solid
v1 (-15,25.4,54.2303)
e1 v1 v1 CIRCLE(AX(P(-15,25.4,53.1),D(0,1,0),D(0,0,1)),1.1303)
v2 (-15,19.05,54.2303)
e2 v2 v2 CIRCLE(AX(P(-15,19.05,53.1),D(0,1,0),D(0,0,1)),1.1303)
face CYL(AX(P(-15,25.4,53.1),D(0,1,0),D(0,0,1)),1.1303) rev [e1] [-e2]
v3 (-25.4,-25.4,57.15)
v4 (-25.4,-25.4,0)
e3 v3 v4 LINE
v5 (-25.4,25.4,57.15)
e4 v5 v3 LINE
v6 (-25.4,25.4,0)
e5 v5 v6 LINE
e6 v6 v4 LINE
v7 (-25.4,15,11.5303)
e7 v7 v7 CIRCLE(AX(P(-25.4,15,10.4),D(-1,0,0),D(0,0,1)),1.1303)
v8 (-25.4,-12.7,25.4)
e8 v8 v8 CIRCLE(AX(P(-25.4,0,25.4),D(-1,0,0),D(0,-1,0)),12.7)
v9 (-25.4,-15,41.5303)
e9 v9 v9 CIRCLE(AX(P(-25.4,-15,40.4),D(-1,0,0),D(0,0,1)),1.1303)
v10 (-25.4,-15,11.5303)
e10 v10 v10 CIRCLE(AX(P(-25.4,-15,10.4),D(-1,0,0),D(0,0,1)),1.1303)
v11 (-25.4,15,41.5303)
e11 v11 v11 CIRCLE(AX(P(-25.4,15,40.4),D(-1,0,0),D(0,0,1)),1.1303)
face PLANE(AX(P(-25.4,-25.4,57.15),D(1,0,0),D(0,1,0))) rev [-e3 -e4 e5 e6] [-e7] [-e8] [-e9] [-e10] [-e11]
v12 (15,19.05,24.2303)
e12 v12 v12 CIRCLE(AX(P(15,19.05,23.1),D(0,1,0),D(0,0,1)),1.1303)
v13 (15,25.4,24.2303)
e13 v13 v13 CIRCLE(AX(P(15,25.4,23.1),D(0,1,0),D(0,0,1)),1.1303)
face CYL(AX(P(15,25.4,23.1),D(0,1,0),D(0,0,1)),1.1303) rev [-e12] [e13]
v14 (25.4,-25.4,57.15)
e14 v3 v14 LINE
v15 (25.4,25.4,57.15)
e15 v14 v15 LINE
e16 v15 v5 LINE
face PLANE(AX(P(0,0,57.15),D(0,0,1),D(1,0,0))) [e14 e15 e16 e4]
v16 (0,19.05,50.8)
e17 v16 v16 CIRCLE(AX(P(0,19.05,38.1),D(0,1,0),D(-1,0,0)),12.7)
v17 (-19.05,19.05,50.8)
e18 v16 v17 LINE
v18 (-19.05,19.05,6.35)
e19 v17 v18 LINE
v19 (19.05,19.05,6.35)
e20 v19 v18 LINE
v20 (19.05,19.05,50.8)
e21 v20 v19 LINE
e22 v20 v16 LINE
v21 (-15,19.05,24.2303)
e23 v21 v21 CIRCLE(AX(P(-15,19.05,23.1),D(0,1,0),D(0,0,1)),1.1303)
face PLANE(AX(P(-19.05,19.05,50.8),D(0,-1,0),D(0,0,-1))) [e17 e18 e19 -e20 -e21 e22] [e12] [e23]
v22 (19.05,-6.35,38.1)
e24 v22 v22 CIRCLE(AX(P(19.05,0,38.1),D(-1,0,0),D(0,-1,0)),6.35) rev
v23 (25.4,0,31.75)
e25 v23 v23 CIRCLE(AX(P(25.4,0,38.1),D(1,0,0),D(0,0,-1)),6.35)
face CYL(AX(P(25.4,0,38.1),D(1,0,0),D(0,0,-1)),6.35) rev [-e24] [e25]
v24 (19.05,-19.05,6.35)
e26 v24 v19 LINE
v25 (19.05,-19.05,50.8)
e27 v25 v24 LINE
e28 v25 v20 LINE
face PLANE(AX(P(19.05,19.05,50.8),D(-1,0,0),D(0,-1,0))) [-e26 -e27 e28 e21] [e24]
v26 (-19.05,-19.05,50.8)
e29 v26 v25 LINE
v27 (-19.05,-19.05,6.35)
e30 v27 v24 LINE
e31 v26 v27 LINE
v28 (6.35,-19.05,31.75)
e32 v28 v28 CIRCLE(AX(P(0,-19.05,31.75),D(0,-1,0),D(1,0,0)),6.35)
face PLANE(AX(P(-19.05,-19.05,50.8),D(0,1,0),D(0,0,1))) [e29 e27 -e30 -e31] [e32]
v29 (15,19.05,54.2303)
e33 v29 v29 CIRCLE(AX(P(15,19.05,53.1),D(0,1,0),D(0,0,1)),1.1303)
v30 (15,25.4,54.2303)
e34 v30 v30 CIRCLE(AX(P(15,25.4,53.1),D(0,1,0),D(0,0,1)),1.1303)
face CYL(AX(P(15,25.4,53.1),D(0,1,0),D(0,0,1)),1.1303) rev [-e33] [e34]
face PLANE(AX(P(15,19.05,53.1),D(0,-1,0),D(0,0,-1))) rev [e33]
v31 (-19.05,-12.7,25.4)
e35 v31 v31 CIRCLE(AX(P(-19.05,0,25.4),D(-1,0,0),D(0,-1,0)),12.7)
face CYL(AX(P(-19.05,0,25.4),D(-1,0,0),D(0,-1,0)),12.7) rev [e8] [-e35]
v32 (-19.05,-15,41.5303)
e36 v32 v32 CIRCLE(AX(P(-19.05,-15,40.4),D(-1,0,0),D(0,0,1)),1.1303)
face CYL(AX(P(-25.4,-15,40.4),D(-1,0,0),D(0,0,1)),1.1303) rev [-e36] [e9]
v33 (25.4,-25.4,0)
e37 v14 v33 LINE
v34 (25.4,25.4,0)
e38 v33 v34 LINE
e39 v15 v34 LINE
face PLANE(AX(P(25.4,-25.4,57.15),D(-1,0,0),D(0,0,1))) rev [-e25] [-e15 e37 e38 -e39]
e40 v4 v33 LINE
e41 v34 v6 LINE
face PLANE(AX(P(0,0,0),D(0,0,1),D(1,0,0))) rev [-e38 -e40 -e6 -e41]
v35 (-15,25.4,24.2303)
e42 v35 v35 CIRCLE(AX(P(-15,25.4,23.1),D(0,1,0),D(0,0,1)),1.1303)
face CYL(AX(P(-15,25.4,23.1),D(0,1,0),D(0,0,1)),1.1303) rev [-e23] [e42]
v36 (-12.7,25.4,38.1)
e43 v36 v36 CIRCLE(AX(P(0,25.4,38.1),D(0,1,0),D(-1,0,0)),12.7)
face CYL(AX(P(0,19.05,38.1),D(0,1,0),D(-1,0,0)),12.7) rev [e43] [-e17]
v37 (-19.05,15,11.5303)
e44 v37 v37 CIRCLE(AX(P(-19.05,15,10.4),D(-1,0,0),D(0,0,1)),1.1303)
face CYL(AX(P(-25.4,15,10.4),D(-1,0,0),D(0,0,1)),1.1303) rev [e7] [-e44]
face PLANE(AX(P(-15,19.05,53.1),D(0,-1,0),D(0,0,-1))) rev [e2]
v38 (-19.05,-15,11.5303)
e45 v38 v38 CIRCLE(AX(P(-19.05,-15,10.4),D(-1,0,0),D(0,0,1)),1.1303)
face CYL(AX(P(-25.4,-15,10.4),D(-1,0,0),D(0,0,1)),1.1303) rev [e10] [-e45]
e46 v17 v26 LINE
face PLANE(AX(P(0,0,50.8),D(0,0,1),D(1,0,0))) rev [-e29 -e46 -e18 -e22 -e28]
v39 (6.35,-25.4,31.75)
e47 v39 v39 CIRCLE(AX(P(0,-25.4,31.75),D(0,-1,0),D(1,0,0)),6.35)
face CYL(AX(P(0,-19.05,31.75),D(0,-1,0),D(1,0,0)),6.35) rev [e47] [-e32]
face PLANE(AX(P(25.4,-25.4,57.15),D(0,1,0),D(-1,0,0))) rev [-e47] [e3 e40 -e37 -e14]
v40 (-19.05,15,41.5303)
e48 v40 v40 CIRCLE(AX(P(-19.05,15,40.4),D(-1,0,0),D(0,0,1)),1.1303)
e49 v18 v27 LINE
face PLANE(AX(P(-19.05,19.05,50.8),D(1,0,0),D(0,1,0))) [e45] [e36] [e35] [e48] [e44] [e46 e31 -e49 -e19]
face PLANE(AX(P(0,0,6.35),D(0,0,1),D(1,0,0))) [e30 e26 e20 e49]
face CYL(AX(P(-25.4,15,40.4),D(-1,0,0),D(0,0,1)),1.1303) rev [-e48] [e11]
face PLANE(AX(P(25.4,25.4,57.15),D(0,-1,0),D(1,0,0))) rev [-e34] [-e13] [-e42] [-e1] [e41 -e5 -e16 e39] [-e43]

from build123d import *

# Parameters (mm, degrees)
SKETCH1_W                                = 50.8
SKETCH1_H                                = 50.8
BOSS_EXTRUDE1_DEPTH                      = 57.15
CUT_EXTRUDE2_START                       = 6.35
SKETCH3_W                                = 38.1
SKETCH3_H                                = 38.1
CUT_EXTRUDE2_DEPTH                       = 44.45
SKETCH5_R                                = 12.7
CUT_EXTRUDE3_DEPTH                       = 6.35
SKETCH6_R                                = 12.7
CUT_EXTRUDE4_DEPTH                       = 6.35
SKETCH7_R                                = 6.35
CUT_EXTRUDE5_DEPTH                       = 6.35
F_3_8_0_375_CLEARANCE_DOWEL_HOLE1_REACH  = 70.392
F_3_8_0_375_CLEARANCE_DOWEL_HOLE1_BORE_R = 6.35
TAP_DRILL_FOR_4_40_TAP1_REACH            = 82.572
TAP_DRILL_FOR_4_40_TAP1_BORE_R           = 1.1303
TAP_START                                = 19.05
TAP_DRILL_FOR_4_40_TAP2_OUTLINE_R        = 1.1303
TAP_DRILL_FOR_4_40_TAP2_DEPTH            = 6.35


# Read off the part's stored shape, not the designer's step: Tap Drill for #4-40 Tap2
with BuildPart() as part:
    # Sketch1 → Boss-Extrude1 (new body)
    with BuildSketch(Plane.XY):
        Rectangle(SKETCH1_W, SKETCH1_H)
    extrude(amount=BOSS_EXTRUDE1_DEPTH)

    # Sketch3 → Cut-Extrude2 (cut)
    with BuildSketch(Plane.XY.offset(CUT_EXTRUDE2_START)):
        Rectangle(SKETCH3_W, SKETCH3_H)
    extrude(amount=CUT_EXTRUDE2_DEPTH, mode=Mode.SUBTRACT)

    # Sketch5 → Cut-Extrude3 (cut)
    with BuildSketch(Plane.ZY.offset(25.4)):
        with Locations(Location((25.4, 0, 0), (0, 0, 270))):
            Circle(SKETCH5_R)
    extrude(amount=-CUT_EXTRUDE3_DEPTH, mode=Mode.SUBTRACT)

    # Sketch6 → Cut-Extrude4 (cut)
    with BuildSketch(Plane(origin=(0, 25.4, 0), x_dir=(1, 0, 0), z_dir=(0, 1, 0))):
        with Locations(Location((0, -38.1, 0), (0, 0, 180))):
            Circle(SKETCH6_R)
    extrude(amount=-CUT_EXTRUDE4_DEPTH, mode=Mode.SUBTRACT)

    # Sketch7 → Cut-Extrude5 (cut)
    with BuildSketch(Plane.XZ.offset(25.4)):
        with Locations((0, 31.75)):
            Circle(SKETCH7_R)
    extrude(amount=-CUT_EXTRUDE5_DEPTH, mode=Mode.SUBTRACT)

    # 3/8 (0.375) Clearance Dowel Hole1 bore (on position points) → 3/8 (0.375) Clearance Dowel Hole1 (cut, up to next)
    with BuildSketch(Plane(origin=(25.4, 0, 38.1), x_dir=(0, 0, 1), z_dir=(1, 0, 0)), mode=Mode.PRIVATE) as f_3_8_0_375_clearance_dowel_hole1_sk1:
        Circle(F_3_8_0_375_CLEARANCE_DOWEL_HOLE1_BORE_R)
    f_3_8_0_375_clearance_dowel_hole1_tool1 = extrude(f_3_8_0_375_clearance_dowel_hole1_sk1.sketch, amount=-F_3_8_0_375_CLEARANCE_DOWEL_HOLE1_REACH, mode=Mode.PRIVATE) & part.part
    add(f_3_8_0_375_clearance_dowel_hole1_tool1.solids().sort_by_distance((25.4, 0, 38.1))[0], mode=Mode.SUBTRACT)

    # Tap Drill for #4-40 Tap1 bore → Tap Drill for #4-40 Tap1 (cut, up to next)
    with BuildSketch(Plane.ZY.offset(25.4), mode=Mode.PRIVATE) as tap_drill_for_4_40_tap1_sk1:
        with Locations((10.4, -15)):
            Circle(TAP_DRILL_FOR_4_40_TAP1_BORE_R)
    tap_drill_for_4_40_tap1_tool1 = extrude(tap_drill_for_4_40_tap1_sk1.sketch, amount=-TAP_DRILL_FOR_4_40_TAP1_REACH, mode=Mode.PRIVATE) & part.part
    # Tap Drill for #4-40 Tap1 bore → Tap Drill for #4-40 Tap1 (cut, up to next)
    with BuildSketch(Plane.ZY.offset(25.4), mode=Mode.PRIVATE) as tap_drill_for_4_40_tap1_sk2:
        with Locations((10.4, 15)):
            Circle(TAP_DRILL_FOR_4_40_TAP1_BORE_R)
    tap_drill_for_4_40_tap1_tool2 = extrude(tap_drill_for_4_40_tap1_sk2.sketch, amount=-TAP_DRILL_FOR_4_40_TAP1_REACH, mode=Mode.PRIVATE) & part.part
    # Tap Drill for #4-40 Tap1 bore → Tap Drill for #4-40 Tap1 (cut, up to next)
    with BuildSketch(Plane.ZY.offset(25.4), mode=Mode.PRIVATE) as tap_drill_for_4_40_tap1_sk3:
        with Locations((40.4, 15)):
            Circle(TAP_DRILL_FOR_4_40_TAP1_BORE_R)
    tap_drill_for_4_40_tap1_tool3 = extrude(tap_drill_for_4_40_tap1_sk3.sketch, amount=-TAP_DRILL_FOR_4_40_TAP1_REACH, mode=Mode.PRIVATE) & part.part
    # Tap Drill for #4-40 Tap1 bore → Tap Drill for #4-40 Tap1 (cut, up to next)
    with BuildSketch(Plane.ZY.offset(25.4), mode=Mode.PRIVATE) as tap_drill_for_4_40_tap1_sk4:
        with Locations((40.4, -15)):
            Circle(TAP_DRILL_FOR_4_40_TAP1_BORE_R)
    tap_drill_for_4_40_tap1_tool4 = extrude(tap_drill_for_4_40_tap1_sk4.sketch, amount=-TAP_DRILL_FOR_4_40_TAP1_REACH, mode=Mode.PRIVATE) & part.part
    add(tap_drill_for_4_40_tap1_tool1.solids().sort_by_distance((-25.4, -15, 10.4))[0], mode=Mode.SUBTRACT)
    add(tap_drill_for_4_40_tap1_tool2.solids().sort_by_distance((-25.4, 15, 10.4))[0], mode=Mode.SUBTRACT)
    add(tap_drill_for_4_40_tap1_tool3.solids().sort_by_distance((-25.4, 15, 40.4))[0], mode=Mode.SUBTRACT)
    add(tap_drill_for_4_40_tap1_tool4.solids().sort_by_distance((-25.4, -15, 40.4))[0], mode=Mode.SUBTRACT)

    # Tap Drill for #4-40 Tap2 outline → Tap Drill for #4-40 Tap2 (cut)
    with BuildSketch(Plane(origin=(0, 0, 0), x_dir=(1, 0, 0), z_dir=(0, 1, 0)).offset(TAP_START)):
        with Locations((-15, -53.1)):
            Circle(TAP_DRILL_FOR_4_40_TAP2_OUTLINE_R)
        with Locations((15, -53.1)):
            Circle(TAP_DRILL_FOR_4_40_TAP2_OUTLINE_R)
        with Locations((15, -23.1)):
            Circle(TAP_DRILL_FOR_4_40_TAP2_OUTLINE_R)
        with Locations((-15, -23.1)):
            Circle(TAP_DRILL_FOR_4_40_TAP2_OUTLINE_R)
    extrude(amount=TAP_DRILL_FOR_4_40_TAP2_DEPTH, mode=Mode.SUBTRACT)


solid = part.part
